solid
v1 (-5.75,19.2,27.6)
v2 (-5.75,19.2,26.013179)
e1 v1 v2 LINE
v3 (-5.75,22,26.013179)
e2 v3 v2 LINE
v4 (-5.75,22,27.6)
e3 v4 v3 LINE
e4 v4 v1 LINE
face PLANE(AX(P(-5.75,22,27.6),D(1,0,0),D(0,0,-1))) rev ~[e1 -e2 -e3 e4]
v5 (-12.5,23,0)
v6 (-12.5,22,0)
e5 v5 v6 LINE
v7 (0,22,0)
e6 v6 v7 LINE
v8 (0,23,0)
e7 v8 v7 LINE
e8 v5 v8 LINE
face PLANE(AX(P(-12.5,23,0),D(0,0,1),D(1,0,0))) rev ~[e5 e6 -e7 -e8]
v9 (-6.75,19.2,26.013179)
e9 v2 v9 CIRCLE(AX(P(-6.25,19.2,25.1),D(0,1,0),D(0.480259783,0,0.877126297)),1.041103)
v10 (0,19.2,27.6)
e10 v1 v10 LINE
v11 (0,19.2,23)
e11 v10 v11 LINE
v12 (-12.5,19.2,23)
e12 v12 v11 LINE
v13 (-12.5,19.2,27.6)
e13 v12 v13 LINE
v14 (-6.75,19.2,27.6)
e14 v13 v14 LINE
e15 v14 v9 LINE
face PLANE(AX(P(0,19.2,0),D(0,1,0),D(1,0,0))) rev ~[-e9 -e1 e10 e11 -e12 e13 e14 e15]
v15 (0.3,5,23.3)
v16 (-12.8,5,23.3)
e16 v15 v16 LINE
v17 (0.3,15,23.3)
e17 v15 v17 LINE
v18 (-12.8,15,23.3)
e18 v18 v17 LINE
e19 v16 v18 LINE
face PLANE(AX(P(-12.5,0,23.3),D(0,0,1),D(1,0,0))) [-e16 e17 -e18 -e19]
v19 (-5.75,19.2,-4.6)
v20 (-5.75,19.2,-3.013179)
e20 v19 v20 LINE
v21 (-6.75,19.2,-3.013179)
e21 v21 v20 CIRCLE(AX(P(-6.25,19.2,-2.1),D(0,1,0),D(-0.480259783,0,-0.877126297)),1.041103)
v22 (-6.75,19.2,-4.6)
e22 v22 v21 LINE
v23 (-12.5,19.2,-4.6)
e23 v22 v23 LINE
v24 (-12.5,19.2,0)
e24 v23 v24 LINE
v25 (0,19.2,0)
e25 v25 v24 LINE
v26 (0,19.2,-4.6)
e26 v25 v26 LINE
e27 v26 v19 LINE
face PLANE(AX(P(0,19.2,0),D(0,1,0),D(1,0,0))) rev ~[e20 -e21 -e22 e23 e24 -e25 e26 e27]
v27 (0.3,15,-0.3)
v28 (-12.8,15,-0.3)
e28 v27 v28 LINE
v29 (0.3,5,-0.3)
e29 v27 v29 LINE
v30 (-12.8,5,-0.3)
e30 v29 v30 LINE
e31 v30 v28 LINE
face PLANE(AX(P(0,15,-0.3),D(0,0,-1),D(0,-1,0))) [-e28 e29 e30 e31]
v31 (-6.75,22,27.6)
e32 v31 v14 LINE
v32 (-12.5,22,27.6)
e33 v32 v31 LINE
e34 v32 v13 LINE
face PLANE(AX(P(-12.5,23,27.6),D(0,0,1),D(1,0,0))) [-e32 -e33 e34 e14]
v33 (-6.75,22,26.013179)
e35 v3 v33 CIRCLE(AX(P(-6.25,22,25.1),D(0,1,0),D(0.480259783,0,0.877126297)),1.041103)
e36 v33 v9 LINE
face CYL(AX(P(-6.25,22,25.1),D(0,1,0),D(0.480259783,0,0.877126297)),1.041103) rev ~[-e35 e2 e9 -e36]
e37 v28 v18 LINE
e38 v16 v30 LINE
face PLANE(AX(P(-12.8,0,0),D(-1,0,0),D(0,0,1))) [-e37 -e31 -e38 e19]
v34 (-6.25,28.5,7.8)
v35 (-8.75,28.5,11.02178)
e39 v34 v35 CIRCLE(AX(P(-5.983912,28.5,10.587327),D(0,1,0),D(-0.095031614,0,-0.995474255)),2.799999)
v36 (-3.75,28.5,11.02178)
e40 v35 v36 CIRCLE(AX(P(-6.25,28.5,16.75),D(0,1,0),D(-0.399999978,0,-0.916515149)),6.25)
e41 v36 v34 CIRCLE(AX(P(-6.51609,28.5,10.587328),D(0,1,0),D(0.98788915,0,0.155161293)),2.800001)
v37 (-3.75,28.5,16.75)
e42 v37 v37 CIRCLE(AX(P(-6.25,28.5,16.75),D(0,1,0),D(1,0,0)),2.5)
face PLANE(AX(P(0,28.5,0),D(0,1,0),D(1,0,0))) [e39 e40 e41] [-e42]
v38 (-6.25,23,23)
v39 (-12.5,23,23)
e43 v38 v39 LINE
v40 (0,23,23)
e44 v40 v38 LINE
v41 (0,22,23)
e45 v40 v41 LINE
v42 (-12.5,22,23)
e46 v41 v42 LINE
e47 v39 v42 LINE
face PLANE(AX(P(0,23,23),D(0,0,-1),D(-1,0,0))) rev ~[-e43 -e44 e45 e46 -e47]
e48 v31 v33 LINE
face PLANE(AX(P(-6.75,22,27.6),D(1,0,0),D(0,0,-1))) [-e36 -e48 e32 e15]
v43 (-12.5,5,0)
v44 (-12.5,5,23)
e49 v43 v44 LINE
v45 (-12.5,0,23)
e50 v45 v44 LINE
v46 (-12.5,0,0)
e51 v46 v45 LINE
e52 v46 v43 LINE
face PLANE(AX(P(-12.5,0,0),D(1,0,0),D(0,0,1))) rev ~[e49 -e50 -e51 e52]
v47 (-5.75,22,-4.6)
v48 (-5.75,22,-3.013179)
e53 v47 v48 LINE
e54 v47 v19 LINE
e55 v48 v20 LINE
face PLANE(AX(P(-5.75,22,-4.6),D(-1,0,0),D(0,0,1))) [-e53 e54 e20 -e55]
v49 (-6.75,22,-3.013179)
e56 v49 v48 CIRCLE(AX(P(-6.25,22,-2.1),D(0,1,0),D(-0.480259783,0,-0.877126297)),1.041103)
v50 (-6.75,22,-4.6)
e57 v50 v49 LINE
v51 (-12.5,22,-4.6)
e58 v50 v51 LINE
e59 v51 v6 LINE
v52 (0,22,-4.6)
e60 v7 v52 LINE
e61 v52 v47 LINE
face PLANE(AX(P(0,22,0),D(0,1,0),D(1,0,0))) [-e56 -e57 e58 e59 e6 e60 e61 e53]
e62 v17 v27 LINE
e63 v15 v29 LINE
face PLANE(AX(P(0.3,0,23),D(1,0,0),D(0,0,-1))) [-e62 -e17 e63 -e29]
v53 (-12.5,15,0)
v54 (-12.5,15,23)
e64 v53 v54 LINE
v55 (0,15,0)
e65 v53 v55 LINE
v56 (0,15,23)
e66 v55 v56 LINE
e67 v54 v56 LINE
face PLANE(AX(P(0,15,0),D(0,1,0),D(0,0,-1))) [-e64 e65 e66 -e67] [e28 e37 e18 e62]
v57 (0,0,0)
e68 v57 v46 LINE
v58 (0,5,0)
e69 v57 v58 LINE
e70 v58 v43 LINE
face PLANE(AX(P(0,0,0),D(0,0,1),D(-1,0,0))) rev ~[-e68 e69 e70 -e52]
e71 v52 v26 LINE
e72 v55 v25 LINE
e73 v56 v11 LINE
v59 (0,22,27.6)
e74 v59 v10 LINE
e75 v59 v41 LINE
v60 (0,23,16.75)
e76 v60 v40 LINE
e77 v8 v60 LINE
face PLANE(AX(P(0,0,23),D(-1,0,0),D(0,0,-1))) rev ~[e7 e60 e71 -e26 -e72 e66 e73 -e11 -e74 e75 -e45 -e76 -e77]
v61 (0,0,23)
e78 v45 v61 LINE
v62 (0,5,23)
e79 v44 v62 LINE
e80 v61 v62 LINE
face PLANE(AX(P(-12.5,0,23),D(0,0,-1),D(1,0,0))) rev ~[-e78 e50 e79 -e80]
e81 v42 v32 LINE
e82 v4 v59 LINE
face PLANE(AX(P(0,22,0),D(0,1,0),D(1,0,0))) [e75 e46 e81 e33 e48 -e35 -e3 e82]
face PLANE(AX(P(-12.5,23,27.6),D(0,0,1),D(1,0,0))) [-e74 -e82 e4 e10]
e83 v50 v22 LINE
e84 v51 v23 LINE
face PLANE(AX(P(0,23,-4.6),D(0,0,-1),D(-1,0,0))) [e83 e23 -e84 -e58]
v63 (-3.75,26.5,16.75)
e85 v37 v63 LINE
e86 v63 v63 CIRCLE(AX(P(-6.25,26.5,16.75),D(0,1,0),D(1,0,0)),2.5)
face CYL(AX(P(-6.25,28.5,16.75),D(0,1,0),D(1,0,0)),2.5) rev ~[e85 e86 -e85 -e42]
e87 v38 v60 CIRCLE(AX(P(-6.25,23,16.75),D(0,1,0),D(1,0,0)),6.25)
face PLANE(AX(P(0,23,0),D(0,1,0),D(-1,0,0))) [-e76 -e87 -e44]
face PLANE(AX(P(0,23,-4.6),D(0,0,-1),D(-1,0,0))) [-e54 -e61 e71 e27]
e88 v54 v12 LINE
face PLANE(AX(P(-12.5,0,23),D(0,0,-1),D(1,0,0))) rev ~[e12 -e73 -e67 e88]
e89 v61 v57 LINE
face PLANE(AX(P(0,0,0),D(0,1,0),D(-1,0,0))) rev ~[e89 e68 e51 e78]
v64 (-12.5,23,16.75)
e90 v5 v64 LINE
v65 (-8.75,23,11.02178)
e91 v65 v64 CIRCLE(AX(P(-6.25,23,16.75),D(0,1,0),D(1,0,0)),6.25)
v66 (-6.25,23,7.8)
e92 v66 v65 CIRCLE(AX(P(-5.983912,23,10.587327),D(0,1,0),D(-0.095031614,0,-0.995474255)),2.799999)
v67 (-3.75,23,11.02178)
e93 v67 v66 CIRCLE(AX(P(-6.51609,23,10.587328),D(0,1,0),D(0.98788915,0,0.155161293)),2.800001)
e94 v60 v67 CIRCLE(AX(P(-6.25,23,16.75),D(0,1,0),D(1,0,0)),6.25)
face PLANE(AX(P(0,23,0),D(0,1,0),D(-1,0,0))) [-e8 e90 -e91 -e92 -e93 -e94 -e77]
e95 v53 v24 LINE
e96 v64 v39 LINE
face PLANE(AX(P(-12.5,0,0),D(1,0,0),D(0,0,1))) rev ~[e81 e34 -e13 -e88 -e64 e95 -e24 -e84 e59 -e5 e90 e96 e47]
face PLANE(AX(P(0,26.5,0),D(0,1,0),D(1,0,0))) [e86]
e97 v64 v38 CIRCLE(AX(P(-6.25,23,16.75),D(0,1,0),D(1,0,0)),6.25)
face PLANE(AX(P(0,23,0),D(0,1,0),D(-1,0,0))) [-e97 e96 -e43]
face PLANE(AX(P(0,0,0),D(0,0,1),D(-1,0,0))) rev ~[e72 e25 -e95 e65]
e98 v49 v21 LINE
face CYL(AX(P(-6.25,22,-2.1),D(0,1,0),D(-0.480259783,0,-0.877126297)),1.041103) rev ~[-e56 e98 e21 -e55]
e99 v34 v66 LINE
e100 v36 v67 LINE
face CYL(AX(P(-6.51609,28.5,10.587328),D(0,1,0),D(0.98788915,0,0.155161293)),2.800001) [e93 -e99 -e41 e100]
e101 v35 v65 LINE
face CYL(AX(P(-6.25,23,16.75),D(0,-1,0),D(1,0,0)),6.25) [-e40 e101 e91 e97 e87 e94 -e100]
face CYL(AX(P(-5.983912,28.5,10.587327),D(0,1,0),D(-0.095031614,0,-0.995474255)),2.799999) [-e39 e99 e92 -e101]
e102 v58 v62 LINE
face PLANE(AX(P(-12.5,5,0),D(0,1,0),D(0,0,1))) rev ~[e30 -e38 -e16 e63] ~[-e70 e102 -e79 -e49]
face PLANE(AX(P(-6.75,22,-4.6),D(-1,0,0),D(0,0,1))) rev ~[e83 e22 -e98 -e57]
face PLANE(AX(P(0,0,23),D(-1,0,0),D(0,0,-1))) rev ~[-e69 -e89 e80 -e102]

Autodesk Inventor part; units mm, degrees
ref_plane "YZ Plane" through (0, 0, 0) normal (1, 0, 0) x (0, 1, 0)
ref_plane "XZ Plane" through (0, 0, 0) normal (0, 1, 0) x (-1, 0, 0)
ref_plane "XY Plane" through (0, 0, 0) normal (0, 0, 1) x (1, 0, 0)
sketch "Sketch1" plane through (0, 0, 0) normal (0, 1, 0) x (-1, 0, 0)
  line L0 (0, 0) -> (12.5, 0)
  line L1 (12.5, 0) -> (12.5, 23)
  line L2 (12.5, 23) -> (0, 23)
  line L3 (0, 23) -> (0, 0)
  dimension "d0" = 12.5
  dimension "d1" = 23
extrude "Extrusion1" add sketch "Sketch1" along normal blind 23
sketch "Sketch2" plane through (0, 23, 0) normal (0, 1, 0) x (1, 0, 0)
  line L0 (0, 0) -> (-12.5, 0) projected
  line L1 (-12.5, 0) -> (-12.5, -23) projected
  line L2 (-12.5, -23) -> (0, -23) projected
  line L3 (0, -23) -> (0, 0) projected
  line L4 (0, 4.6) -> (-12.5, 4.6)
  line L5 (-12.5, 4.6) -> (-12.5, -27.6)
  line L6 (-12.5, -27.6) -> (0, -27.6)
  line L7 (0, -27.6) -> (0, 4.6)
  line L8 (0, 4.6) -> (-12.5, -27.6) construction
  line L9 (-12.5, 4.6) -> (0, -27.6) construction
  point P0 (-6.25, -11.5)
  dimension "d4" = 32.2
extrude "Extrusion2" add sketch "Sketch2" against normal blind 3.8 contours L0 L5 L4 L7 | L7 L6 L5 L2
sketch "Sketch3" plane through (0, 23, 0) normal (0, 1, 0) x (1, 0, 0)
  line L0 (-12.5, 4.6) -> (-12.5, -27.6) projected
  line L1 (-12.5, -27.6) -> (0, -27.6) projected
  line L2 (0, -27.6) -> (0, 4.6) projected
  line L3 (0, 4.6) -> (-12.5, 4.6) projected
  line L4 (0, -23) -> (-12.5, -23) projected
  line L5 (-12.5, 0) -> (0, 0) projected
extrude "Extrusion3" cut sketch "Sketch3" against normal blind 1 contours L3 L2 L5 L0 | L4 L2 L1 L0
sketch "Sketch4" plane through (0, 23, 0) normal (0, 1, 0) x (1, 0, 0)
  line L0 (-12.5, -23) -> (0, -23) projected
  line L1 (-6.25, -23) -> (-6.25, -16.75)
  circle A0 centre (-6.25, -16.75) radius 6.25
  dimension "d9" = 6.25
extrude "Extrusion4" add sketch "Sketch4" along normal blind 5.5
sketch "Sketch5" plane through (-6.25, 28.5, 16.75) normal (0, 1, 0) x (1, 0, 0)
  circle A0 centre (0, 0) radius 6.25
  arc A1 (0, -8.95) -> (2.5, -5.72822) centre (-0.266089, -6.162672) ccw
  arc A2 (-2.5, -5.72822) -> (0, -8.95) centre (0.266089, -6.162672) ccw
  arc A3 (0, -8.95) -> (2.5, -5.72822) centre (-0.266089, -6.162672) ccw
  arc A4 (-2.5, -5.72822) -> (0, -8.95) centre (0.266089, -6.162672) ccw
  arc A5 (-2.5, -5.72822) -> (2.5, -5.72822) centre (0, 0) ccw
  line L0 (0, 0) -> (-2.287713, 0)
  arc A6 (2.5, 5.72822) -> (0, 8.95) centre (-0.266089, 6.162672) ccw
  arc A7 (0, 8.95) -> (-2.5, 5.72822) centre (0.266089, 6.162672) ccw
  arc A8 (2.5, 5.72822) -> (0, 8.95) centre (-0.266089, 6.162672) ccw
  arc A9 (0, 8.95) -> (-2.5, 5.72822) centre (0.266089, 6.162672) ccw
  arc A10 (2.5, 5.72822) -> (-2.5, 5.72822) centre (0, 0) ccw
  point P0 (6.25, 16.75)
  dimension "d14" = 2.8
extrude "Extrusion5" add sketch "Sketch5" against normal blind 7.5 contours A0 A7 A6
sketch "Sketch6" plane through (0, 28.5, 0) normal (0, 1, 0) x (1, 0, 0)
  arc A0 (-8.75, -11.02178) -> (-3.75, -11.02178) centre (-6.25, -16.75) ccw
  circle A1 centre (-6.25, -16.75) radius 3.475
  point P0 (0, 0)
  dimension "d17" = 6.95
extrude "Extrusion6" cut sketch "Sketch6" against normal blind 2
sketch "Sketch7" plane through (0, 28.5, 0) normal (0, 1, 0) x (1, 0, 0)
  circle A0 centre (-6.25, -16.75) radius 3.475
  arc A1 (-8.75, -11.02178) -> (-3.75, -11.02178) centre (-6.25, -16.75) ccw
  circle A2 centre (-6.25, -16.75) radius 3.5
  point P0 (0, 0)
  dimension "d20" = 7
sketch "Sketch7 outline for Extrusion7" plane through (0, 28.5, 0) normal (0, 1, 0) x (1, 0, 0)
  circle A0 centre (-6.25, -16.75) radius 3.475
extrude "Extrusion7" cut sketch "Sketch7 outline for Extrusion7" against normal blind 2
sketch "Sketch8" plane through (0, 22, 0) normal (0, 1, 0) x (1, 0, 0)
  line L0 (0, -27.6) -> (-12.5, -27.6)
  line L1 (0, -23) -> (0, -27.6)
  line L2 (-12.5, -23) -> (0, -23)
  line L3 (-12.5, -27.6) -> (-12.5, -23)
  line L4 (-12.5, 0) -> (-12.5, 4.6)
  line L5 (0, 0) -> (-12.5, 0)
  line L6 (0, 4.6) -> (0, 0)
  line L7 (-12.5, 4.6) -> (0, 4.6)
  arc A0 (-5.75, -26.013179) -> (-6.75, -26.013179) centre (-6.25, -25.1) ccw
  arc A1 (-6.75, -27.6) -> (-5.75, -27.6) centre (-6.25, -27.6) ccw
  line L8 (0, -27.6) -> (-12.5, -27.6)
  line L9 (-5.75, -27.6) -> (-5.75, -26.013179)
  line L10 (-6.75, -27.6) -> (-6.75, -26.013179)
  line L11 (0, -23) -> (0, 0)
  line L12 (0, -11.5) -> (-20.862921, -11.5)
  arc A2 (-6.75, 3.013179) -> (-5.75, 3.013179) centre (-6.25, 2.1) ccw
  arc A3 (-5.75, 4.6) -> (-6.75, 4.6) centre (-6.25, 4.6) ccw
  line L13 (-5.75, 4.6) -> (-5.75, 3.013179)
  line L14 (-6.75, 4.6) -> (-6.75, 3.013179)
extrude "Extrusion8" cut sketch "Sketch8" against normal blind 10 contours L0 L10 A0 L9 | A3 L7 | L7 L13 A2 L14
sketch "Sketch9" plane through (0, 28.5, 0) normal (0, 1, 0) x (1, 0, 0)
  circle A0 centre (-6.25, -16.75) radius 3.475
  arc A1 (-8.75, -11.02178) -> (-3.75, -11.02178) centre (-6.25, -16.75) ccw
  arc A2 (-3.75, -11.02178) -> (-6.25, -7.8) centre (-6.516089, -10.587328) ccw
  arc A3 (-6.25, -7.8) -> (-8.75, -11.02178) centre (-5.983911, -10.587328) ccw
  circle A4 centre (-6.25, -16.75) radius 2.5
  point P0 (0, 0)
  dimension "d29" = 5
extrude "Extrusion9" add sketch "Sketch9" against normal blind 10 contours A0
sketch "Sketch10" plane through (-12.5, 0, 0) normal (-1, 0, 0) x (0, 0, 1)
  line L0 (0, 23) -> (0, 22) projected
  line L1 (0, 22) -> (-4.6, 22) projected
  line L2 (-4.6, 22) -> (-4.6, 19.2) projected
  line L3 (0, 19.2) -> (-4.6, 19.2) projected
  line L4 (0, 0) -> (0, 19.2) projected
  line L5 (0, 0) -> (23, 0) projected
  line L6 (23, 0) -> (23, 19.2) projected
  line L7 (27.6, 19.2) -> (23, 19.2) projected
  line L8 (27.6, 22) -> (27.6, 19.2) projected
  line L9 (27.6, 22) -> (23, 22) projected
  line L10 (23, 22) -> (23, 23) projected
  line L11 (16.75, 23) -> (23, 23) projected
  line L12 (0, 23) -> (16.75, 23) projected
  line L13 (0, 0) -> (0, 5)
  line L14 (0, 0) -> (0, 19.2) projected
  line L15 (0, 5) -> (23, 5)
  line L16 (23, 0) -> (23, 19.2) projected
  line L17 (0, 5) -> (0, 15)
  line L18 (0, 15) -> (23, 15)
  dimension "d32" = 5
  dimension "d33" = 10
extrude "Extrusion11" add sketch "Sketch10" along normal blind 0.3 contours L18 L6 L15 L4
sketch "Sketch11" plane through (-12.5, 0, 23) normal (0, 0, 1) x (1, 0, 0)
  line L0 (12.5, 0) -> (12.5, 19.2) projected
  line L1 (-0.3, 5) -> (-0.3, 15) projected
  line L2 (-0.3, 15) -> (12.5, 15)
  line L3 (12.5, 15) -> (12.8, 15)
  line L4 (12.8, 15) -> (-0.3, 15)
  line L5 (-0.3, 15) -> (-0.3, 5)
  line L6 (-0.3, 5) -> (12.8, 5)
  line L7 (12.8, 5) -> (12.8, 15)
  point P0 (0, 15)
  dimension "d38" = 0.3
extrude "Extrusion12" add sketch "Sketch11" along normal blind 0.3
sketch "Sketch12" plane through (0, 0, 23) normal (1, 0, 0) x (0, 0, -1)
  line L0 (23, 22) -> (23, 23)
  line L1 (6.25, 23) -> (23, 23)
  line L2 (0, 23) -> (6.25, 23)
  line L3 (0, 23) -> (0, 22)
  line L4 (0, 22) -> (-4.6, 22)
  line L5 (-4.6, 22) -> (-4.6, 19.2)
  line L6 (0, 19.2) -> (-4.6, 19.2)
  line L7 (0, 15) -> (0, 19.2)
  line L8 (0, 5) -> (0, 15)
  line L9 (0, 0) -> (0, 5)
  line L10 (0, 0) -> (23, 0)
  line L11 (23, 0) -> (23, 19.2)
  line L12 (27.6, 19.2) -> (23, 19.2)
  line L13 (27.6, 22) -> (27.6, 19.2)
  line L14 (27.6, 22) -> (23, 22)
  line L15 (23, 0) -> (23, 19.2)
  line L16 (-0.411339, 5) -> (23, 5)
  line L17 (23, 5) -> (23.3, 5)
  line L18 (-0.3, 15) -> (23.3, 15)
  line L19 (23.3, 15) -> (23.3, 5)
  line L20 (23.3, 5) -> (-0.3, 5)
  line L21 (-0.3, 5) -> (-0.3, 15)
  dimension "d41" = 0.3
extrude "Extrusion13" add sketch "Sketch12" along normal blind 0.3 contours L18 L19 L17 L11 | L11 L16 L8 L18 | L8 L16 L21 L18
sketch "Sketch13" plane through (0, 0, 0) normal (0, 0, -1) x (-1, 0, 0)
  line L0 (-0.3, 5) -> (12.8, 5)
  line L1 (12.8, 5) -> (12.8, 15)
  line L2 (12.8, 15) -> (-0.3, 15)
  line L3 (-0.3, 15) -> (-0.3, 5)
  point P0 (0, 0)
extrude "Extrusion14" add sketch "Sketch13" along normal blind 0.3
properties part number "servo" material "LCP Plastic"
